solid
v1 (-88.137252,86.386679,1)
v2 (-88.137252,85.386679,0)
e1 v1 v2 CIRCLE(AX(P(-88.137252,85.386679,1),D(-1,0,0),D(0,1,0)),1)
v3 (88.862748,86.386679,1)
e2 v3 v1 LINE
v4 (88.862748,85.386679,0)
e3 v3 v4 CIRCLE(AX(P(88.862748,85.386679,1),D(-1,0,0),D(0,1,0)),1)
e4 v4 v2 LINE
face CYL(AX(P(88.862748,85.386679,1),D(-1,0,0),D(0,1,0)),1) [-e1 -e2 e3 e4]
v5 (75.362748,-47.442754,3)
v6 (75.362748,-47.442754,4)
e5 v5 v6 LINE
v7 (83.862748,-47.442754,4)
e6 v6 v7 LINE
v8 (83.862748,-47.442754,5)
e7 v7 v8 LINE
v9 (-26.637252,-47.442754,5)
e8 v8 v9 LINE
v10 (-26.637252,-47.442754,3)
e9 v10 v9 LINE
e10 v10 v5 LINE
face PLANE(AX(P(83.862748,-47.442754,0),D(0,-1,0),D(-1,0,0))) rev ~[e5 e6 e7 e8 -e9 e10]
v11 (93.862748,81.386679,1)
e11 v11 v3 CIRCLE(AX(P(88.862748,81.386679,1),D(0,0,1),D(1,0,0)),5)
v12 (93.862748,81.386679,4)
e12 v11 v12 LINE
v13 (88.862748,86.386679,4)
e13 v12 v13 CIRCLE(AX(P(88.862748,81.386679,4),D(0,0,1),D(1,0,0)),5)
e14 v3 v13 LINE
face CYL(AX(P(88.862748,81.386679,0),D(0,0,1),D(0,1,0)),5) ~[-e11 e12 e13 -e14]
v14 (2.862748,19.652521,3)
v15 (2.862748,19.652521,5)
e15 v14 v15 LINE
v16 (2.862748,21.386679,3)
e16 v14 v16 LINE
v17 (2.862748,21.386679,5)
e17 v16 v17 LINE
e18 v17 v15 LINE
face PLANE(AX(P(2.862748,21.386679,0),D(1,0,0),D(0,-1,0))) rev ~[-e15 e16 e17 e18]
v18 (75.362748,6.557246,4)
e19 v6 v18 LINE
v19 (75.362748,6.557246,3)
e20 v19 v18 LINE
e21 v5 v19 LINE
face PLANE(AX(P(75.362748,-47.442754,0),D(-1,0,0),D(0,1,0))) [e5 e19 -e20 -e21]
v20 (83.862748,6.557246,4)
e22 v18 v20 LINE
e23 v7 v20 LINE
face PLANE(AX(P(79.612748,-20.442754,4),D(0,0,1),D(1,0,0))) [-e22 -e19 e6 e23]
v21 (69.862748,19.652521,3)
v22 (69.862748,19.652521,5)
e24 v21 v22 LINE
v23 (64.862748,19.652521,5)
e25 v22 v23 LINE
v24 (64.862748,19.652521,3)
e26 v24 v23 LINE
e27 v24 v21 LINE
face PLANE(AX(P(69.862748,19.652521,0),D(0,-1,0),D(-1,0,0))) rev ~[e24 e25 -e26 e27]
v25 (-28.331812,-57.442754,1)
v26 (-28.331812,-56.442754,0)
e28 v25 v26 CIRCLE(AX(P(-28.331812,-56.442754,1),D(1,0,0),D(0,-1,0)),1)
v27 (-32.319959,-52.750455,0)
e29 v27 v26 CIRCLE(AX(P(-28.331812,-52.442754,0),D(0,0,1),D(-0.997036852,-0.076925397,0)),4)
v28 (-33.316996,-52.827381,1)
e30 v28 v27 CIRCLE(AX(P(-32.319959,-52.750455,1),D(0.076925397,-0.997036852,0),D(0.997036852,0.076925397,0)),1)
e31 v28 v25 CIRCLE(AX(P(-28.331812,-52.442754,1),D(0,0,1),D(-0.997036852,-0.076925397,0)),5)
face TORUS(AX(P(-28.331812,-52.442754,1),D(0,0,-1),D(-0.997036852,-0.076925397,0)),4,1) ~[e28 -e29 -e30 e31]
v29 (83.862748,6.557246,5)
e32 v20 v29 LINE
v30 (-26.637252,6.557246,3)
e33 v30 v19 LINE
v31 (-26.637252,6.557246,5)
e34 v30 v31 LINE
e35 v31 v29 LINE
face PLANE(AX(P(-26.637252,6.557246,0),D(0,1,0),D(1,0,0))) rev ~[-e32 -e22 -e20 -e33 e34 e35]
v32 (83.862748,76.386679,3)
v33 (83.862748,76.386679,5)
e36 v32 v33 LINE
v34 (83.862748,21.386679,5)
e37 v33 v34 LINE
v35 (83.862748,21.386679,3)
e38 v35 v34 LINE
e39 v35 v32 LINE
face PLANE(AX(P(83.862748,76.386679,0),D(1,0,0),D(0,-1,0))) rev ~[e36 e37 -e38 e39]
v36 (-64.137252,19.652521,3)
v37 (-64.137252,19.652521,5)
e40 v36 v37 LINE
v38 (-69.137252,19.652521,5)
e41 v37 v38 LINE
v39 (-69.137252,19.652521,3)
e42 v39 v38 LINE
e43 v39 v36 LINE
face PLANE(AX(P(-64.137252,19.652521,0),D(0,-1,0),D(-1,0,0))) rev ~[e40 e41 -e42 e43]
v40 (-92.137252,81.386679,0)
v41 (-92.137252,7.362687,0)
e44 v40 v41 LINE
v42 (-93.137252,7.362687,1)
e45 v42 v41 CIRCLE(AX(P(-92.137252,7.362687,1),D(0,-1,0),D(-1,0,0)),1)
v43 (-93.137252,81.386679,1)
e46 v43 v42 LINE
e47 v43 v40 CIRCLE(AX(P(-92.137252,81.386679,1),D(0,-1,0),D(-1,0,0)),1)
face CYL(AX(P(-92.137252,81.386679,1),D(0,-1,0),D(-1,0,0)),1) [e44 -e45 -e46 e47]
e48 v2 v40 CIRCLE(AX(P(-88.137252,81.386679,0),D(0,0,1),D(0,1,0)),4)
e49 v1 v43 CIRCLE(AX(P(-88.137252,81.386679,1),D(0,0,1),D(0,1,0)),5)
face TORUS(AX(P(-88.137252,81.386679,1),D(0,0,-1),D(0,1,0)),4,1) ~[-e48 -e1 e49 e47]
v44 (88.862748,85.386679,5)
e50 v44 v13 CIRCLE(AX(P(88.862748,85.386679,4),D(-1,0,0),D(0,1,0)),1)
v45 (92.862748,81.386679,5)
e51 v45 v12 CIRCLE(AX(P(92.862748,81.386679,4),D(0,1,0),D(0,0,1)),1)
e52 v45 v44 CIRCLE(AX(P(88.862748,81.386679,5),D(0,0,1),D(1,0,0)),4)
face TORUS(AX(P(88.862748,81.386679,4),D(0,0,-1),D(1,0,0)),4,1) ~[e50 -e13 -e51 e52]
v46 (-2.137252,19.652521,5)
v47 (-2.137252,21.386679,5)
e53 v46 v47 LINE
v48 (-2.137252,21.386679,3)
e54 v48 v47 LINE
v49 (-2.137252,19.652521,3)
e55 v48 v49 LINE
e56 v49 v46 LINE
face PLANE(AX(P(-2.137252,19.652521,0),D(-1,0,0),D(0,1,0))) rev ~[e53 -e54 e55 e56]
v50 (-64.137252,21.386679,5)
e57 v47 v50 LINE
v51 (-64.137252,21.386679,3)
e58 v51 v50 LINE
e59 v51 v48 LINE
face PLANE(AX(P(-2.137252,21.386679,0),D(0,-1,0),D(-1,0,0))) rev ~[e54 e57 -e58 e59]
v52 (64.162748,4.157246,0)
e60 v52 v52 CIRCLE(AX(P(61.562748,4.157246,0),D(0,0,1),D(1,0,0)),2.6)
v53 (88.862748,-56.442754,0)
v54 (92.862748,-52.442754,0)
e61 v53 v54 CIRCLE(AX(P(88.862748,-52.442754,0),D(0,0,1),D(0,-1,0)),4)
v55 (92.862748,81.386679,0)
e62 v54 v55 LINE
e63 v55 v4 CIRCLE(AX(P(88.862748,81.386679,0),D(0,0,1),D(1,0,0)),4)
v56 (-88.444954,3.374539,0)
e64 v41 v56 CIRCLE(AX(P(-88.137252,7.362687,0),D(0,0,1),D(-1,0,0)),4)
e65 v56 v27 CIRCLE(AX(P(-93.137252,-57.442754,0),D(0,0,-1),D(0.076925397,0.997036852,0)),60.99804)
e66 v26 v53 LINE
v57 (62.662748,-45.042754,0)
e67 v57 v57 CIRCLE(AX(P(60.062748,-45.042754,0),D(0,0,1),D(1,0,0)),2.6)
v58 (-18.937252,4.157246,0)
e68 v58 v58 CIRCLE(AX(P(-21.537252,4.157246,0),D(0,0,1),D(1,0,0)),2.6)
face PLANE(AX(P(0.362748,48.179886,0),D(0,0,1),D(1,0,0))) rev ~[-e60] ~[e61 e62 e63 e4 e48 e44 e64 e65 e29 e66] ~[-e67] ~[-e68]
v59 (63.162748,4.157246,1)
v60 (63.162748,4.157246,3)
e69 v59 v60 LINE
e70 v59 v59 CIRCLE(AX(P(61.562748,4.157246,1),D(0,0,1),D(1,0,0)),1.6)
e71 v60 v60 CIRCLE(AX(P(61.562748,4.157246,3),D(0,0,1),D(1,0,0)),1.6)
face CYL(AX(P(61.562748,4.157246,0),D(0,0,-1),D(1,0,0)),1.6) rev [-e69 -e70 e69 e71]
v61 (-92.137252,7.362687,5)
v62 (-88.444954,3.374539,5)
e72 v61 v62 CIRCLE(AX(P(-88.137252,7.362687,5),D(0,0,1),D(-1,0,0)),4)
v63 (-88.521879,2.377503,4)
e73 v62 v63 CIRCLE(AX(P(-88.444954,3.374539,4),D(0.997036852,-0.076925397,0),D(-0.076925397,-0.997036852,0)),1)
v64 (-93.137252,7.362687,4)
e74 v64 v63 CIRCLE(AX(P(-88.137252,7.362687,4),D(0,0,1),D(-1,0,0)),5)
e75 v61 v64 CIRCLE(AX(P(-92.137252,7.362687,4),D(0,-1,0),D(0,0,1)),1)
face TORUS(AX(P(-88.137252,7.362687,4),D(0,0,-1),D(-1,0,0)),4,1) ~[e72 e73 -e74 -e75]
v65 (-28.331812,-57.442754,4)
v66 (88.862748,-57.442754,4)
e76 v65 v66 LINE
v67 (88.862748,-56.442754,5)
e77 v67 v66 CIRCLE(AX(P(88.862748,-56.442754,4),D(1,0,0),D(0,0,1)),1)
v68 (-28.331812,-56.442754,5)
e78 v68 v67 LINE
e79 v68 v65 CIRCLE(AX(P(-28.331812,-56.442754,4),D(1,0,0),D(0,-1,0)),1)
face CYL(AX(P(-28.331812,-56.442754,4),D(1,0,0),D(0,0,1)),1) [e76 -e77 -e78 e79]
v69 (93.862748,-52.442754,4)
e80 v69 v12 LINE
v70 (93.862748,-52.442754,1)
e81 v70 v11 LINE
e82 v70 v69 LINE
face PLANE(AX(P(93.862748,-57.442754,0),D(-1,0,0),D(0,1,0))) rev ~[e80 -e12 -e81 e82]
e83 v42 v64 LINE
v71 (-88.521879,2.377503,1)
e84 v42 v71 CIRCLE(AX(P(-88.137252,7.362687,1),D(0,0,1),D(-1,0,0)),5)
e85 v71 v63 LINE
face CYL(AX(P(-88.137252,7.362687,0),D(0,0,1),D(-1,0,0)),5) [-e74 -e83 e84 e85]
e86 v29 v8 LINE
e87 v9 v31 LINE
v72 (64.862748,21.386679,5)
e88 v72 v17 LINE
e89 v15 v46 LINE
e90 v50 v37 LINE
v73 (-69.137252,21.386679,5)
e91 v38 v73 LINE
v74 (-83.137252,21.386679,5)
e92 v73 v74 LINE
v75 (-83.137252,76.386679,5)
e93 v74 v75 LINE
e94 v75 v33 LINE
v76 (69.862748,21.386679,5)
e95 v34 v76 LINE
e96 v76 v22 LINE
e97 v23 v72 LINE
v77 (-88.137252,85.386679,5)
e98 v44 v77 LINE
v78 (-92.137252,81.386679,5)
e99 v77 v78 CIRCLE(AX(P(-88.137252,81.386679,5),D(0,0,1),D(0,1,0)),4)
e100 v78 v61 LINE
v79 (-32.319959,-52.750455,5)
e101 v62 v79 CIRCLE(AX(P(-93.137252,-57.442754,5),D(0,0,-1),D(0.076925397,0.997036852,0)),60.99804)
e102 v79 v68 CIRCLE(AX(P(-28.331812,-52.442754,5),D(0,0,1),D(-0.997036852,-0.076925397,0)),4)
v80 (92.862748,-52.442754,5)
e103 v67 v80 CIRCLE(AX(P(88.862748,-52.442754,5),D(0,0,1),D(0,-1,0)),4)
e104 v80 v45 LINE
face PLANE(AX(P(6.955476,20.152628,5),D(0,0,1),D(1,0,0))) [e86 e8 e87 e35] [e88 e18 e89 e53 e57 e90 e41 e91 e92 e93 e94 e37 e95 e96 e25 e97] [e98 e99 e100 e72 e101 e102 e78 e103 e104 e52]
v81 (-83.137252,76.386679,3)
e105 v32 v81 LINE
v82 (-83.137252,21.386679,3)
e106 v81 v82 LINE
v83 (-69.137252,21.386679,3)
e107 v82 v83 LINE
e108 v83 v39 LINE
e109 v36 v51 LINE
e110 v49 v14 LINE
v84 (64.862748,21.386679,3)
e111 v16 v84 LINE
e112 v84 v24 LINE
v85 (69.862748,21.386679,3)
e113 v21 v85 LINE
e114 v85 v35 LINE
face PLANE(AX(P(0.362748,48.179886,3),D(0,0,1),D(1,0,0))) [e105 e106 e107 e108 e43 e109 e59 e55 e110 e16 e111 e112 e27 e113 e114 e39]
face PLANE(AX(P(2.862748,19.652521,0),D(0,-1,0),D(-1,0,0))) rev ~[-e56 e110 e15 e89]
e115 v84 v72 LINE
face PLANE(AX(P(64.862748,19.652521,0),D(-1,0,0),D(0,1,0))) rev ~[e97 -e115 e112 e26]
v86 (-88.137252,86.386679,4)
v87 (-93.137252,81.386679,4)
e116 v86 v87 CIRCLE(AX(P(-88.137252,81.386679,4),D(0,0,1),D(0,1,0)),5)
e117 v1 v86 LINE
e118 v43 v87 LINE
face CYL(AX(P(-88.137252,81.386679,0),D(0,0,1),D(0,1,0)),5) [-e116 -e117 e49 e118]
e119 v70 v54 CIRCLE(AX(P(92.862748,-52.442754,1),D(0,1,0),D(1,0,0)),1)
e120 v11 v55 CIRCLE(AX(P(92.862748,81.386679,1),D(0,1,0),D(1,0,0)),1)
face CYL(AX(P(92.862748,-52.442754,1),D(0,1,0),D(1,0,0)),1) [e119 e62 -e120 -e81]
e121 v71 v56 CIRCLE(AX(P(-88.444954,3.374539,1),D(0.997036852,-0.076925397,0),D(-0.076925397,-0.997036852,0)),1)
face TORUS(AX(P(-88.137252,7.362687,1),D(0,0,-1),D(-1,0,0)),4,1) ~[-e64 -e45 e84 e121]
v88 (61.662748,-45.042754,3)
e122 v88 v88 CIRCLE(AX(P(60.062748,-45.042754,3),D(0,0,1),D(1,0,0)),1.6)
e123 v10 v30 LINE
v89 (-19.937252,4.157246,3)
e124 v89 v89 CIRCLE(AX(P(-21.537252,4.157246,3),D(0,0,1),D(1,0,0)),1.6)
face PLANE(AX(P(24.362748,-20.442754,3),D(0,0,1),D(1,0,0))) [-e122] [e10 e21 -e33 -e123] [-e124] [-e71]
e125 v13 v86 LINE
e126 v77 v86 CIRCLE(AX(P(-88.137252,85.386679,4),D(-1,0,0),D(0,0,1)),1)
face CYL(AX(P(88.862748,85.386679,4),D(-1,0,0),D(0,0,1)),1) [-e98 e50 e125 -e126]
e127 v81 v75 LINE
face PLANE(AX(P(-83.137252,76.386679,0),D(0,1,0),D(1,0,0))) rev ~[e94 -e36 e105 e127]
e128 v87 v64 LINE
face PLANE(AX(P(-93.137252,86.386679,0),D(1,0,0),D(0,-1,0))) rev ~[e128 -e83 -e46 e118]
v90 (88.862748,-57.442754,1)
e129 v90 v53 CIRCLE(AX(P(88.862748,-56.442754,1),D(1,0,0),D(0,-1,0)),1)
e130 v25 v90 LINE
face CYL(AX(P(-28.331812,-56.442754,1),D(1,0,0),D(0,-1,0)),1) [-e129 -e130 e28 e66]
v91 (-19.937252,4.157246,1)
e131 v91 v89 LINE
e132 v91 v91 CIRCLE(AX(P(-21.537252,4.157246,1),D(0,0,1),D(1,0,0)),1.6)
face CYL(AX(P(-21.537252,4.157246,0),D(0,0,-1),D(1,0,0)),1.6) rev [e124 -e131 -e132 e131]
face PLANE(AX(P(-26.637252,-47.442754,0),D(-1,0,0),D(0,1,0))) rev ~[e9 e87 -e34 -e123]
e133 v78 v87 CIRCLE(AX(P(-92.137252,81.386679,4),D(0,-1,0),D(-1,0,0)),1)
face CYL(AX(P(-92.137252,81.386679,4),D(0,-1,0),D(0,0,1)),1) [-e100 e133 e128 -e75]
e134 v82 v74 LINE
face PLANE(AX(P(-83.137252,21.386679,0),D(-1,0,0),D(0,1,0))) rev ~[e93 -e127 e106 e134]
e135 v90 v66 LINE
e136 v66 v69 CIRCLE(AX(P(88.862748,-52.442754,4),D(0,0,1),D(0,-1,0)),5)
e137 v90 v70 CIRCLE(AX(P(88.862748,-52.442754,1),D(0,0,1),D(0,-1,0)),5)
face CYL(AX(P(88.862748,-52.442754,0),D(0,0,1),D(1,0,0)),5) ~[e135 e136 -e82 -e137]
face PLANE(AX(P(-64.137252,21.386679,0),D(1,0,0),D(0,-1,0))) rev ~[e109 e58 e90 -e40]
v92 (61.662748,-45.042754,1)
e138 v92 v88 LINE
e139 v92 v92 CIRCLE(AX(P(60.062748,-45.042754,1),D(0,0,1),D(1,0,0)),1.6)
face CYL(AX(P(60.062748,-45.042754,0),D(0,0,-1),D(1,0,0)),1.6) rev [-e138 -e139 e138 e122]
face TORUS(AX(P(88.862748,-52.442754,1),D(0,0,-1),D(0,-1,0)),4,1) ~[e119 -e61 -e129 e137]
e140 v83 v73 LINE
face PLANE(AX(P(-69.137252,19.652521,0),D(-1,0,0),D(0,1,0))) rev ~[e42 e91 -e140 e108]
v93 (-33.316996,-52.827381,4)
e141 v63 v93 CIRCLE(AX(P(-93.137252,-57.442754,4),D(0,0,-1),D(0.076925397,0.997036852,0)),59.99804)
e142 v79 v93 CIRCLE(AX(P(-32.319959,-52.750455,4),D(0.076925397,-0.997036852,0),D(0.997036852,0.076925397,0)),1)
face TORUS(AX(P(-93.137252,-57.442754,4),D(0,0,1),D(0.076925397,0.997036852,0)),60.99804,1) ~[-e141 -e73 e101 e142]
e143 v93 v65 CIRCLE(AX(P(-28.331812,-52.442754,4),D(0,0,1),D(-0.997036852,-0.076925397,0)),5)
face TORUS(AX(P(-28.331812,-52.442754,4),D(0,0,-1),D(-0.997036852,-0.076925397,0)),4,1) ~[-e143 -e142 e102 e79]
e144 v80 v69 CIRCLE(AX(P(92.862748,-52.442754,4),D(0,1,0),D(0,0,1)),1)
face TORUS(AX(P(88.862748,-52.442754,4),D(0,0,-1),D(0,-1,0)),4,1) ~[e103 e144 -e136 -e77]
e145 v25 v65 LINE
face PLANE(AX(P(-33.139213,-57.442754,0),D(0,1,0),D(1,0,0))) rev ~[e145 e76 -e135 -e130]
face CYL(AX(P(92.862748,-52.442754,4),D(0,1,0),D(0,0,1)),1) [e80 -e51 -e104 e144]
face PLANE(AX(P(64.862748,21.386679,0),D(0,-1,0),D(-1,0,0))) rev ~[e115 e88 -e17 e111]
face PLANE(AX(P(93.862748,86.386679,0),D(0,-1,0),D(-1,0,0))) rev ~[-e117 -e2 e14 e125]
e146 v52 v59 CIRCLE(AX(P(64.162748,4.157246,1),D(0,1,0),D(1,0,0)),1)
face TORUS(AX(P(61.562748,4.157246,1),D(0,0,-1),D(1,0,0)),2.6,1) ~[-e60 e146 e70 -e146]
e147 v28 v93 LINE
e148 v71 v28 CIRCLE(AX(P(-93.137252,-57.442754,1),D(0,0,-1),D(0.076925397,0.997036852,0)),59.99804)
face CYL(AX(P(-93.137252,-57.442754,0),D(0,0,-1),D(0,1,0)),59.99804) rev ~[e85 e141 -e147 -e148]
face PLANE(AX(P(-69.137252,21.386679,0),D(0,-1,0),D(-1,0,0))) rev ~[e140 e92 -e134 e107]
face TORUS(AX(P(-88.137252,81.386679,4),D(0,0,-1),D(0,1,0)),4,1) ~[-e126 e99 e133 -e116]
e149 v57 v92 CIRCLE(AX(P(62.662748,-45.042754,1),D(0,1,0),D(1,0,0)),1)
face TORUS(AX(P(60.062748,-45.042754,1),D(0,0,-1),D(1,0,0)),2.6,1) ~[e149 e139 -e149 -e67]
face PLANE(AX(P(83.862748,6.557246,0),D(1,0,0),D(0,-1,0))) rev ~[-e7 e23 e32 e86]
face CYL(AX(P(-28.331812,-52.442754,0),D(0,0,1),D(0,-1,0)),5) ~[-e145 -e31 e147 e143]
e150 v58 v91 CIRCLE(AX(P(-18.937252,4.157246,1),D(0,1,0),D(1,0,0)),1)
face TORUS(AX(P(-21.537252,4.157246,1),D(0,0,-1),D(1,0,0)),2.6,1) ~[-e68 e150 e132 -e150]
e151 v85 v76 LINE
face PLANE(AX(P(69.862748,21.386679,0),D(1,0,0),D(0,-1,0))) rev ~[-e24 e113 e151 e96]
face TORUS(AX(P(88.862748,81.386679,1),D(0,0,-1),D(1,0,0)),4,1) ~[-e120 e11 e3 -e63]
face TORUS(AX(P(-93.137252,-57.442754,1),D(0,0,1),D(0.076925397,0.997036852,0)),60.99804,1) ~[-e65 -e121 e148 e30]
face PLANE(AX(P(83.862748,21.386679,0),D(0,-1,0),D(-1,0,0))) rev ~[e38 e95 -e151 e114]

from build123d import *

# Parameters (mm, degrees)
F1_DEPTH = 5
F0_W     = 102
F0_H     = 54
F0_R     = 1.6
F2_DEPTH = 3
F0_W_2   = 8.5
F3_DEPTH = 4
F4_R     = 5
F5_R     = 1


with BuildPart() as f1:
    # F0 (on Top) → F1 (new body)
    with BuildSketch(Plane.XY):
        with BuildLine():
            Line((93.8627476096, 86.3866787127), (-93.1372523904, 86.3866787127))
            Line((-93.1372523904, 86.3866787127), (-93.1372523904, 2.5552856157))
            ThreePointArc((-93.1372523904, 2.5552856157), (-50.7122317842, -15.0177333034), (-33.1392128652, -57.4427539095))
            Line((-33.1392128652, -57.4427539095), (93.8627476096, -57.4427539095))
            Line((93.8627476096, -57.4427539095), (93.8627476096, 86.3866787127))
        make_face()
        Polygon((-26.6372523904, -47.4427539095), (-26.6372523904, 6.5572460905), (75.3627476096, 6.5572460905), (83.8627476096, 6.5572460905), (83.8627476096, -47.4427539095), (75.3627476096, -47.4427539095), align=None, mode=Mode.SUBTRACT)
        Polygon((-83.1372523904, 21.3866787127), (-83.1372523904, 76.3866787127), (83.8627476096, 76.3866787127), (83.8627476096, 21.3866787127), (69.8627476096, 21.3866787127), (69.8627476096, 19.6525212377), (64.8627476096, 19.6525212377), (64.8627476096, 21.3866787127), (2.8627476096, 21.3866787127), (2.8627476096, 19.6525212377), (-2.1372523904, 19.6525212377), (-2.1372523904, 21.3866787127), (-64.1372523904, 21.3866787127), (-64.1372523904, 19.6525212377), (-69.1372523904, 19.6525212377), (-69.1372523904, 21.3866787127), align=None, mode=Mode.SUBTRACT)
    extrude(amount=F1_DEPTH)

    # F0 (on Top) → F2 (join)
    with BuildSketch(Plane.XY):
        Polygon((83.8627476096, 76.3866787127), (-83.1372523904, 76.3866787127), (-83.1372523904, 21.3866787127), (-69.1372523904, 21.3866787127), (-69.1372523904, 19.6525212377), (-64.1372523904, 19.6525212377), (-64.1372523904, 21.3866787127), (-2.1372523904, 21.3866787127), (-2.1372523904, 19.6525212377), (2.8627476096, 19.6525212377), (2.8627476096, 21.3866787127), (64.8627476096, 21.3866787127), (64.8627476096, 19.6525212377), (69.8627476096, 19.6525212377), (69.8627476096, 21.3866787127), (83.8627476096, 21.3866787127), align=None)
        with Locations((24.3627476096, -20.4427539095)):
            Rectangle(F0_W, F0_H)
        with Locations((-21.5372523904, 4.1572460905)):
            Circle(F0_R, mode=Mode.SUBTRACT)
        with Locations((60.0627476096, -45.0427539095)):
            Circle(F0_R, mode=Mode.SUBTRACT)
        with Locations((61.5627476096, 4.1572460905)):
            Circle(F0_R, mode=Mode.SUBTRACT)
    extrude(amount=F2_DEPTH)

    # F0 (on Top) → F3 (join)
    with BuildSketch(Plane.XY):
        with Locations((79.6127476096, -20.4427539095)):
            Rectangle(F0_W_2, F0_H)
    extrude(amount=F3_DEPTH)

    # F4
    f4_edges = [f1.edges().sort_by_distance(p)[0] for p in [
        (93.862748, -57.442754, 2.5),
        (93.862748, 86.386679, 2.5),
        (-93.137252, 86.386679, 2.5),
        (-33.139213, -57.442754, 2.5),
        (-93.137252, 2.555286, 2.5),
    ]]
    fillet(f4_edges, radius=F4_R)

    # F5
    f5_edges = [f1.edges().sort_by_distance(p)[0] for p in [
        (93.862748, 14.471962, 5),
        (93.862748, 14.471962, 0),
        (92.398282, -55.978288, 0),
        (92.398282, 84.922213, 0),
        (30.265468, -57.442754, 0),
        (0.362748, 86.386679, 0),
        (-31.728639, -56.111755, 0),
        (-91.672786, 84.922213, 0),
        (-50.712232, -15.017733, 0),
        (-93.137252, 44.374683, 0),
        (-91.806253, 3.96586, 0),
        (59.962748, 4.157246, 0),
        (-23.137252, 4.157246, 0),
        (58.462748, -45.042754, 0),
        (92.398282, -55.978288, 5),
        (92.398282, 84.922213, 5),
        (30.265468, -57.442754, 5),
        (0.362748, 86.386679, 5),
        (-31.728639, -56.111755, 5),
        (-91.672786, 84.922213, 5),
        (-50.712232, -15.017733, 5),
        (-93.137252, 44.374683, 5),
        (-91.806253, 3.96586, 5),
    ]]
    fillet(f5_edges, radius=F5_R)


solid = f1.part
